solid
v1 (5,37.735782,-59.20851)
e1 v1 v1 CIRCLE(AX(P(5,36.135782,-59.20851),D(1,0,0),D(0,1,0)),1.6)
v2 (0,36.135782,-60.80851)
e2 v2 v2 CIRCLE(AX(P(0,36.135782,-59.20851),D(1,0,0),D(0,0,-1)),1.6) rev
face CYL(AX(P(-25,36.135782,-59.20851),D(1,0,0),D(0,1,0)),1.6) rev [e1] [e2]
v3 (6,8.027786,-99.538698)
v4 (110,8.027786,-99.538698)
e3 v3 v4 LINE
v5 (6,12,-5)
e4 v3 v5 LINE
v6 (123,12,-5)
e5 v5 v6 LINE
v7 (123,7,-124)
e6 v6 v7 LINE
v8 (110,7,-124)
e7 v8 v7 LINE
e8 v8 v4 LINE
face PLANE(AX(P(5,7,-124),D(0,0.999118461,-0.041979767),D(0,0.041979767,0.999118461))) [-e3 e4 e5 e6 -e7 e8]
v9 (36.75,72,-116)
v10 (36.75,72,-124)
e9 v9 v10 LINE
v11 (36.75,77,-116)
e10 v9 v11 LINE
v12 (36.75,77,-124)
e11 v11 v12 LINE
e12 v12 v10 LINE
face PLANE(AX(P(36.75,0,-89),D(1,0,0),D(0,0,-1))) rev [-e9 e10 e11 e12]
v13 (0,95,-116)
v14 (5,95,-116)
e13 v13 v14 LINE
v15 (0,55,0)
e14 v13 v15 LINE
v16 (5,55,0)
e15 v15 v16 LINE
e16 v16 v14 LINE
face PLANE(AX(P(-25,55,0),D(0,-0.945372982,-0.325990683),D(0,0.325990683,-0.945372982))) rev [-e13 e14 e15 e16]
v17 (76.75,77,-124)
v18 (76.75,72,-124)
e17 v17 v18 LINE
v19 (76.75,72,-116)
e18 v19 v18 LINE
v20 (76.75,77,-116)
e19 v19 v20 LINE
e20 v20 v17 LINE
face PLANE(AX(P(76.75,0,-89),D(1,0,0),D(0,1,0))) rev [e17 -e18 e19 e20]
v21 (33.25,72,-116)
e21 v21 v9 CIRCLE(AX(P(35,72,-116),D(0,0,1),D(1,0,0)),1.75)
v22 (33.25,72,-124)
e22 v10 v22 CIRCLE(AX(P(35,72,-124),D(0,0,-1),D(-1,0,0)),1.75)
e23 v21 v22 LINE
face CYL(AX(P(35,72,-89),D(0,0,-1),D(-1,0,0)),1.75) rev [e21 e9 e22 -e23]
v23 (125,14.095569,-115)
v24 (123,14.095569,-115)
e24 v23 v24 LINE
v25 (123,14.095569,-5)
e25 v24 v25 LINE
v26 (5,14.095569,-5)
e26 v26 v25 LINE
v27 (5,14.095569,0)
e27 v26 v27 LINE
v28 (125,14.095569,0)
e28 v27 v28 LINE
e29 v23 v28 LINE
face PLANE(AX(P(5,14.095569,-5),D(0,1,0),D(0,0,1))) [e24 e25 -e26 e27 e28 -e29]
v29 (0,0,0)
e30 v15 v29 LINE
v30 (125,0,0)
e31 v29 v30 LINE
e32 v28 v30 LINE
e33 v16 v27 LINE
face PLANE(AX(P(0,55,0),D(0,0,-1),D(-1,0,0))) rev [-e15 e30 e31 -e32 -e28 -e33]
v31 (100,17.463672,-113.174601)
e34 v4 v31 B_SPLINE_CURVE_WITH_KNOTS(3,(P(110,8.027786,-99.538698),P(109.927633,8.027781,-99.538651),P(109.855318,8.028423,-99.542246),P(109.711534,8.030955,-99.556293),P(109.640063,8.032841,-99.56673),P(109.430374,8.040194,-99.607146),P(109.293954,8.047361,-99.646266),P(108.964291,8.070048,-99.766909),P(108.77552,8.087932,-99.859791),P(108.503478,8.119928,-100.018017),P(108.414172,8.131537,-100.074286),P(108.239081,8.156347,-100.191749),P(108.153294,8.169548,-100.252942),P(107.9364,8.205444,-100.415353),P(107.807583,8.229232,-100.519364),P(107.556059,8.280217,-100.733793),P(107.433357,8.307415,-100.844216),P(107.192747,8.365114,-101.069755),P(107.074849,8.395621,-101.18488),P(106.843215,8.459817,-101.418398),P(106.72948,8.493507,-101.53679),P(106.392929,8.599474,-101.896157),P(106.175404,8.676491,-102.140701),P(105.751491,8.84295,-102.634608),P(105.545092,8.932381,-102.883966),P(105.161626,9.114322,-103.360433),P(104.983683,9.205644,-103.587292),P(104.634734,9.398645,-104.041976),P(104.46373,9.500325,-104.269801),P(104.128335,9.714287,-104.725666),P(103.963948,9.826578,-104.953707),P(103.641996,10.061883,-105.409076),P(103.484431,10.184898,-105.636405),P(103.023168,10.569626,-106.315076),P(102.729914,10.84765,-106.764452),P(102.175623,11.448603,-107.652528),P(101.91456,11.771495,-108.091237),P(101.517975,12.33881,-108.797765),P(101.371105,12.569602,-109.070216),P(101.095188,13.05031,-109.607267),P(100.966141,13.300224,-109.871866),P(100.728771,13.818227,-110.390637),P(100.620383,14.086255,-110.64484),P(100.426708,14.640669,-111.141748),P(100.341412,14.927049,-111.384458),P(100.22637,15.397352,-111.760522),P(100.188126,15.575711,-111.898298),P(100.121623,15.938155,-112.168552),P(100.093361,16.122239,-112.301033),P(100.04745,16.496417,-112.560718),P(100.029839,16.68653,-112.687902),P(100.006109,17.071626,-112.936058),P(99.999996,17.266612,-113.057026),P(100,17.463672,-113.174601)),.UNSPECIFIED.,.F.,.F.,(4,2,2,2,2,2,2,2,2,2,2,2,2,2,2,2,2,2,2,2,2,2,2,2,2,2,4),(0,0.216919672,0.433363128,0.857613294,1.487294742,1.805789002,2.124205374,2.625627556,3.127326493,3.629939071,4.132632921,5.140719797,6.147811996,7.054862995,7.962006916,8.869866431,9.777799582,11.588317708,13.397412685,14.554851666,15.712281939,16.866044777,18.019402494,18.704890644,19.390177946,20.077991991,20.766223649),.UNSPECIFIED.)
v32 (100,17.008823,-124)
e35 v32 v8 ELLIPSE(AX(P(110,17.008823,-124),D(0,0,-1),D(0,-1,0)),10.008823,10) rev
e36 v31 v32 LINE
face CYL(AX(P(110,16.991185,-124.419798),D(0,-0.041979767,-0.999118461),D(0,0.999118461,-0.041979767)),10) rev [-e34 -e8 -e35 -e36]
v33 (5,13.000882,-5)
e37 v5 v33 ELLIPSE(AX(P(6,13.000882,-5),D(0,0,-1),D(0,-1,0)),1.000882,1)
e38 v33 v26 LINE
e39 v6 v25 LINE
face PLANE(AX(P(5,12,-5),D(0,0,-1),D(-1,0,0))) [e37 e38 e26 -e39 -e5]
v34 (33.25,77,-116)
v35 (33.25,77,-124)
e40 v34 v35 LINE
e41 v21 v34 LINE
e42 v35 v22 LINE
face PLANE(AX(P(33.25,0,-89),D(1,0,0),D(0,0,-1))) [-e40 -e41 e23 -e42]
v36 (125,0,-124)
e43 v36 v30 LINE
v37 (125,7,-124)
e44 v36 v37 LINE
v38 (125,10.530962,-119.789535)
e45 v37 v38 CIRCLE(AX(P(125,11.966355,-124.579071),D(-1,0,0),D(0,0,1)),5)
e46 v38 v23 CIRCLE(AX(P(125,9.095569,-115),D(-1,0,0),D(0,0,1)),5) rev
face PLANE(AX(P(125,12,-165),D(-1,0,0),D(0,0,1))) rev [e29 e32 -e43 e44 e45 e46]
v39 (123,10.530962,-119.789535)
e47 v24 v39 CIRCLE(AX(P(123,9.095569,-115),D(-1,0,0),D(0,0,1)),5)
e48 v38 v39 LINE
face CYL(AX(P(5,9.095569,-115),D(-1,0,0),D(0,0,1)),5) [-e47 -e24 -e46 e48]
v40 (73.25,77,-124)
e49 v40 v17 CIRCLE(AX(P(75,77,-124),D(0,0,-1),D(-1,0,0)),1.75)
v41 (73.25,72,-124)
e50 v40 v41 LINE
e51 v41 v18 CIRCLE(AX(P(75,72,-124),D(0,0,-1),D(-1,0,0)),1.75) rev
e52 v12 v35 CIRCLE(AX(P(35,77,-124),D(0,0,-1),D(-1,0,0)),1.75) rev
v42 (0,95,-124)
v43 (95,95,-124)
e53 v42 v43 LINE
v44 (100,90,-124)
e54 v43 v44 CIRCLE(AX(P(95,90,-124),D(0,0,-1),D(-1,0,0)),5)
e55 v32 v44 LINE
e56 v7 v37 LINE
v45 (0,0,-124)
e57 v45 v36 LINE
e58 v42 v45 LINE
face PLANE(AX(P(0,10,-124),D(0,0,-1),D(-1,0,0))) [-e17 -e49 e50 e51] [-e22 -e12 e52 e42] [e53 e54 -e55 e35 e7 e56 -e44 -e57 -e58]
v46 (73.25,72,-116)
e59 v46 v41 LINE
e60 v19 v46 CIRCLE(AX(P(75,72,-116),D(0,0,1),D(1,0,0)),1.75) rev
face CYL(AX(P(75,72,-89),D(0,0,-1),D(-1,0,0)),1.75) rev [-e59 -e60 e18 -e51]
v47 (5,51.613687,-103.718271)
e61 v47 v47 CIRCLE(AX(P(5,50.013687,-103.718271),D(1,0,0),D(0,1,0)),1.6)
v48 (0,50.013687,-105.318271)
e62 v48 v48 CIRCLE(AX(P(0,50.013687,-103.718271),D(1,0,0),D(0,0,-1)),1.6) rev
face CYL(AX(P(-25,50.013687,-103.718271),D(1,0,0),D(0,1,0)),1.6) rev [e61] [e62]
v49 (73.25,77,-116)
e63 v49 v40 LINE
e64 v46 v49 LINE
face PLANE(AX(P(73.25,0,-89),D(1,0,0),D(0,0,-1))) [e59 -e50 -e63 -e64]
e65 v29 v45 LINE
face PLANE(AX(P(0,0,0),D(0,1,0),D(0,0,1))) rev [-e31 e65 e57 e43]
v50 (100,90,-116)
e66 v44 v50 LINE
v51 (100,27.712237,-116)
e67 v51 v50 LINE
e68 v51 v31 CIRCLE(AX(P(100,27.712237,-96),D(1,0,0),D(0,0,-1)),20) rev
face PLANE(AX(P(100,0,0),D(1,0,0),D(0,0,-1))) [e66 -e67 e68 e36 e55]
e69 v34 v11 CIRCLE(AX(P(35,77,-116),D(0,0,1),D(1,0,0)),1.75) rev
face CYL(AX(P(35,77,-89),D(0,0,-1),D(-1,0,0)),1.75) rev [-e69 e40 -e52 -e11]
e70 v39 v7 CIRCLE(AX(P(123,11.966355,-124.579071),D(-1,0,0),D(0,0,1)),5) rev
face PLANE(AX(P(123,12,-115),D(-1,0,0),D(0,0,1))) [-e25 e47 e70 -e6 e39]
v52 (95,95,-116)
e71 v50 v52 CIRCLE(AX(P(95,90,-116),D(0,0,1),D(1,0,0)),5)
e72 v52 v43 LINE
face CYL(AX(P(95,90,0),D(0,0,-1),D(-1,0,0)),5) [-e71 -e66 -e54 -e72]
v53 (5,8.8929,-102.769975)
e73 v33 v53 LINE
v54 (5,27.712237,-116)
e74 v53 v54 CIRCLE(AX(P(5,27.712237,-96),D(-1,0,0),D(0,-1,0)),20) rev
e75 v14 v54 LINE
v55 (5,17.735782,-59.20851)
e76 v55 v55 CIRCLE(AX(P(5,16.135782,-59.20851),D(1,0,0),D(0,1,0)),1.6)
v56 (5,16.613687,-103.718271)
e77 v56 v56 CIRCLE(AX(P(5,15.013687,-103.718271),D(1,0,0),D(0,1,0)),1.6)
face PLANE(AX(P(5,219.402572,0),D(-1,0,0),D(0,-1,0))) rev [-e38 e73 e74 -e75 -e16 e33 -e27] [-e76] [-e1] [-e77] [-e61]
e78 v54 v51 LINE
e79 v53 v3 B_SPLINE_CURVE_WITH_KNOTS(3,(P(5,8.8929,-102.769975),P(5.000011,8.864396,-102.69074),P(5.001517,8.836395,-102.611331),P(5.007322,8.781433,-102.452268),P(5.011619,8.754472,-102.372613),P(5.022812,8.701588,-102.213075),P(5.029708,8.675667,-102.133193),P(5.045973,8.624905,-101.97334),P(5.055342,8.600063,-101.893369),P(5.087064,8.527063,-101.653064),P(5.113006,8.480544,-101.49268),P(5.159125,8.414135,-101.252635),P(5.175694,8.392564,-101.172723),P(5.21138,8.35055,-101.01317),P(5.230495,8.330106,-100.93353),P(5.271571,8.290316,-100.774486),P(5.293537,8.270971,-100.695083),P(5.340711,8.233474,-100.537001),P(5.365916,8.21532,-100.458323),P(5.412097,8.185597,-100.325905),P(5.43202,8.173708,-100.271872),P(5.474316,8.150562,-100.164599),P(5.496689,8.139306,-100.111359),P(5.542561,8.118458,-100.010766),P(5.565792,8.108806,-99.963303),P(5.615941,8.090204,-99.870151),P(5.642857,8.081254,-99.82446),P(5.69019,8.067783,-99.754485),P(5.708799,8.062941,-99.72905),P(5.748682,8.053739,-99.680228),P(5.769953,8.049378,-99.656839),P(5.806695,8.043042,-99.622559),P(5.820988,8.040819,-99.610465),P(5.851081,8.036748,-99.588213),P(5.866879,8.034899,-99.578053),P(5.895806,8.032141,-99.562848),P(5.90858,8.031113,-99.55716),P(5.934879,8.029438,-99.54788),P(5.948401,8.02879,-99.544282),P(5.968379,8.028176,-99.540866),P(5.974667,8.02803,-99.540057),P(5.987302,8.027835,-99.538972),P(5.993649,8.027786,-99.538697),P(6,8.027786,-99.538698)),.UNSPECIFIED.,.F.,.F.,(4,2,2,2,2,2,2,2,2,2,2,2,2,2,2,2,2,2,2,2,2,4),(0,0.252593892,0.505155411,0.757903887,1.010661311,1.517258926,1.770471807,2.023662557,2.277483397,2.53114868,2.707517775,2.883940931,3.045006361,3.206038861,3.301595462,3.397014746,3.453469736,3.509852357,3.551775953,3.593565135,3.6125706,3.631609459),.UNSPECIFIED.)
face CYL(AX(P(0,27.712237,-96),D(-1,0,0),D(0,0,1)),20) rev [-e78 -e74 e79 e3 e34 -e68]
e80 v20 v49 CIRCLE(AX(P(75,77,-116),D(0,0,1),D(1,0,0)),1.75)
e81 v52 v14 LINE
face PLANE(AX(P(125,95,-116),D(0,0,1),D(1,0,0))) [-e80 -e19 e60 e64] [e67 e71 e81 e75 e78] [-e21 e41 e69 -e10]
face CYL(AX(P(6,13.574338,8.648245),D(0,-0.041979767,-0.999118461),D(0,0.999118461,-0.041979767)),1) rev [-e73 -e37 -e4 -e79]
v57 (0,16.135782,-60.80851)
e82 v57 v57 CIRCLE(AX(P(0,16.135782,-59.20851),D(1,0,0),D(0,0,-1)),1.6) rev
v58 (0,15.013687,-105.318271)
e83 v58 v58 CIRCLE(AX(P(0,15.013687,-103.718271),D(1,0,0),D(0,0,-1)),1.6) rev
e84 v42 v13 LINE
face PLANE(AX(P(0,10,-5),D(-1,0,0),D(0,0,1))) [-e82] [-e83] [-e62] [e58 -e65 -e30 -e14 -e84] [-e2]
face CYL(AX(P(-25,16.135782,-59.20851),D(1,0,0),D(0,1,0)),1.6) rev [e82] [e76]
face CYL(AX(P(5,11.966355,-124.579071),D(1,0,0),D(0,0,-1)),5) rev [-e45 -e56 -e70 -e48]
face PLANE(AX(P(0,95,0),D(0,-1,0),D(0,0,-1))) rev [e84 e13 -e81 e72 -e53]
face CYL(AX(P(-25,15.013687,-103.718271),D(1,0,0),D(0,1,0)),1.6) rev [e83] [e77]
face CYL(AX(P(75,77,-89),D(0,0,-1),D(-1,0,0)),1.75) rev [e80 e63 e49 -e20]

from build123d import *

# Parameters (mm, degrees)
SKETCH1_W            = 155
SKETCH1_H            = 5
BOSS_EXTRUDE2_DEPTH  = 55
SKETCH2_W            = 112
SKETCH2_H            = 45
SKETCH2_R            = 1.75
CUT_EXTRUDE1_DEPTH   = 55
SKETCH3_W            = 100
SKETCH3_H            = 20
CUT_EXTRUDE2_DEPTH   = 55
SKETCH4_W            = 40
SKETCH4_H            = 8.065867699
CUT_EXTRUDE3_DEPTH   = 55
BOSS_EXTRUDE4_DEPTH  = 5
CUT_EXTRUDE4_DEPTH   = 50
SKETCH9_W            = 4.377781836
SKETCH9_H            = 86.488706471
BOSS_EXTRUDE7_DEPTH  = 50
SKETCH10_W           = 20
SKETCH10_H           = 86.532324722
CUT_EXTRUDE5_DEPTH   = 10
SKETCH12_R           = 9.5
SKETCH12_R_2         = 6
CUT_EXTRUDE6_DEPTH   = 10
CUT_EXTRUDE7_START   = 50
SKETCH13_R           = 9.5
SKETCH13_R_2         = 6
CUT_EXTRUDE7_DEPTH   = 50
CUT_EXTRUDE8_DEPTH   = 50
CUT_EXTRUDE9_DEPTH   = 50
CUT_EXTRUDE10_DEPTH  = 10
FILLET5_R            = 3
SKETCH18_W           = 98.767816147
SKETCH18_H           = 10.604205858
BOSS_EXTRUDE8_DEPTH  = 5
CUT_EXTRUDE11_DEPTH  = 5
SKETCH20_W           = 155
SKETCH20_H           = 119
BOSS_EXTRUDE9_DEPTH  = 10
CUT_EXTRUDE13_DEPTH  = 155
SKETCH24_W           = 125
SKETCH24_H           = 8
BOSS_EXTRUDE10_DEPTH = 95
FILLET6_R            = 20
SKETCH26_W           = 16
SKETCH26_H           = 1.5
BOSS_EXTRUDE11_DEPTH = 12
BOSS_EXTRUDE12_DEPTH = 15
SKETCH28_R           = 2.5
CUT_EXTRUDE15_DEPTH  = 5
CUT_EXTRUDE17_DEPTH  = 35
SKETCH29_W           = 43
SKETCH29_H           = 43
CUT_EXTRUDE18_DEPTH  = 35
FILLET9_R            = 10
SKETCH31_W           = 124
SKETCH31_H           = 12
BOSS_EXTRUDE14_DEPTH = 2
SKETCH32_W           = 5
SKETCH32_H           = 2
BOSS_EXTRUDE15_DEPTH = 132
SKETCH33_W           = 20
SKETCH33_H           = 12
CUT_EXTRUDE19_DEPTH  = 160
SKETCH34_W           = 2
SKETCH34_H           = 12
BOSS_EXTRUDE17_DEPTH = 123
SKETCH36_R           = 6
CUT_EXTRUDE20_DEPTH  = 40
CUT_EXTRUDE21_DEPTH  = 25
SKETCH39_W           = 10
SKETCH39_H           = 12
CUT_EXTRUDE22_DEPTH  = 165
SKETCH40_W           = 2
SKETCH40_H           = 12
BOSS_EXTRUDE18_DEPTH = 115
SKETCH41_W           = 5
SKETCH41_H           = 64.538049938
BOSS_EXTRUDE19_DEPTH = 5
BOSS_EXTRUDE20_REACH = 223.912
SKETCH42_W           = 10
SKETCH42_H           = 124
SKETCH45_R           = 1.6
CUT_EXTRUDE23_DEPTH  = 30
SKETCH46_W           = 157.555653428
SKETCH46_H           = 97.617109351
CUT_EXTRUDE24_DEPTH  = 160
BOSS_EXTRUDE22_DEPTH = 120
SKETCH52_W           = 2
SKETCH52_H           = 14.095569493
BOSS_EXTRUDE23_DEPTH = 120
FILLET14_R           = 10
FILLET15_R           = 5
FILLET16_R           = 5
FILLET17_R           = 5
FILLET18_R           = 1
CUT_EXTRUDE27_DEPTH  = 30


with BuildPart() as part:
    # Sketch1 → Boss-Extrude2 (new body)
    with BuildSketch(Plane(origin=(0, 0, 0), x_dir=(1, 0, 0), z_dir=(0, 1, 0))):
        Polygon((-44.578450817, 29.59757322), (-48.782107146, 26.890310125), (-130, 153), (-125.796343671, 155.707263095), align=None)
        with BuildLine():
            ThreePointArc((0, 0), (-27.802696096, 7.256044178), (-48.782107146, 26.890310125))
            Line((-48.782107146, 26.890310125), (-44.578450817, 29.59757322))
            Line((-44.578450817, 29.59757322), (0, 5))
            Line((0, 5), (0, 0))
        make_face()
        with Locations((77.5, 2.5)):
            Rectangle(SKETCH1_W, SKETCH1_H)
    extrude(amount=BOSS_EXTRUDE2_DEPTH)

    # Sketch2 → Cut-Extrude1 (cut)
    with BuildSketch(Plane.XY):
        with Locations((99, 32.5)):
            Rectangle(SKETCH2_W, SKETCH2_H)
        with Locations((5, 25)):
            Circle(SKETCH2_R)
        with Locations((5, 50)):
            Circle(SKETCH2_R)
        with Locations((35, 50)):
            Circle(SKETCH2_R)
        with Locations((35, 25)):
            Circle(SKETCH2_R)
    extrude(amount=-CUT_EXTRUDE1_DEPTH, mode=Mode.SUBTRACT)

    # Sketch3 → Cut-Extrude2 (cut)
    with BuildSketch(Plane(origin=(-22.239707671, 0, 14.322945338), x_dir=(0.5414526190246729, 0, 0.840731265834287), z_dir=(-0.8407312658342869, 0, 0.5414526190246728))):
        with Locations((-99.020724146, 15)):
            Rectangle(SKETCH3_W, SKETCH3_H)
    extrude(amount=-CUT_EXTRUDE2_DEPTH, mode=Mode.SUBTRACT)

    # Sketch4 → Cut-Extrude3 (cut)
    with BuildSketch(Plane(origin=(2.114976352, 0, -3.832994761), x_dir=(-0.8755563671808256, 0, -0.48311597767939257), z_dir=(0.48311597767939257, 0, -0.8755563671808256))):
        with Locations((28.330006975, 9.03293385)):
            Rectangle(SKETCH4_W, SKETCH4_H)
    extrude(amount=-CUT_EXTRUDE3_DEPTH, mode=Mode.SUBTRACT)

    # Sketch5 → Boss-Extrude4 (add)
    with BuildSketch(Plane.XZ):
        Polygon((0, -5), (-44.578450817, -29.59757322), (-125.796343671, -155.707263095), (0, -155.707263095), align=None)
    extrude(amount=-BOSS_EXTRUDE4_DEPTH)

    # Sketch8 → Cut-Extrude4 (cut)
    with BuildSketch(Plane(origin=(0, 5, 0), x_dir=(1, 0, 0), z_dir=(0, 1, 0))):
        Polygon((-44.578450817, 29.59757322), (-98.72371272, 113.670699803), (-44.578450817, 113.670699803), align=None)
    extrude(amount=-CUT_EXTRUDE4_DEPTH, mode=Mode.SUBTRACT)

    # Sketch9 → Boss-Extrude7 (add)
    with BuildSketch(Plane(origin=(0, 5, 0), x_dir=(1, 0, 0), z_dir=(0, 1, 0))):
        with Locations((-42.389559899, 70.426346568)):
            Rectangle(SKETCH9_W, SKETCH9_H)
    extrude(amount=BOSS_EXTRUDE7_DEPTH)

    # Sketch10 → Cut-Extrude5 (cut)
    with BuildSketch(Plane(origin=(0, 5, 0), x_dir=(1, 0, 0), z_dir=(0, 1, 0))):
        with Locations((-30.200668981, 70.404537442)):
            Rectangle(SKETCH10_W, SKETCH10_H)
    extrude(amount=-CUT_EXTRUDE5_DEPTH, mode=Mode.SUBTRACT)

    # Sketch12 → Cut-Extrude6 (cut)
    with BuildSketch(Plane(origin=(-40.200668981, 0, 0), x_dir=(0, 0, -1), z_dir=(1, 0, 0))):
        with Locations(Location((57.181993332, 10, 0), (0, 0, 90))):
            Circle(SKETCH12_R)
        with Locations(Location((77.181993332, 10, 0), (0, 0, 90))):
            Circle(SKETCH12_R_2)
    extrude(amount=-CUT_EXTRUDE6_DEPTH, mode=Mode.SUBTRACT)

    # Sketch13 → Cut-Extrude7 (cut)
    with BuildSketch(Plane(origin=(-40.200668981, 0, 0), x_dir=(0, 0, -1), z_dir=(1, 0, 0)).offset(CUT_EXTRUDE7_START)):
        with Locations(Location((57.181993332, 10, 0), (0, 0, 90))):
            Circle(SKETCH13_R)
        with Locations(Location((77.181993332, 10, 0), (0, 0, 90))):
            Circle(SKETCH13_R_2)
    extrude(amount=-CUT_EXTRUDE7_DEPTH, mode=Mode.SUBTRACT)

    # Sketch14 → Cut-Extrude8 (cut)
    with BuildSketch(Plane(origin=(0, 5, 0), x_dir=(1, 0, 0), z_dir=(0, 1, 0))):
        Polygon((0, 103.038090201), (-91.876037903, 103.038090201), (-126.106254173, 155.707263095), (0, 155.707263095), align=None)
    extrude(amount=-CUT_EXTRUDE8_DEPTH, mode=Mode.SUBTRACT)

    # Sketch15 → Cut-Extrude9 (cut)
    with BuildSketch(Plane(origin=(-22.239707671, 0, 14.322945338), x_dir=(0.5414526190246729, 0, 0.840731265834287), z_dir=(-0.8407312658342869, 0, 0.5414526190246728))):
        Polygon((-176.035909688, 0), (-199.020724146, 18.247450711), (-199.020724146, 0), align=None)
    extrude(amount=-CUT_EXTRUDE9_DEPTH, mode=Mode.SUBTRACT)

    # Sketch16 → Cut-Extrude10 (cut)
    with BuildSketch(Plane(origin=(-40.200668981, 0, 0), x_dir=(0, 0, -1), z_dir=(1, 0, 0))):
        Polygon((113.670699803, 15.495236251), (48.252901996, 55), (113.670699803, 55), align=None)
    extrude(amount=-CUT_EXTRUDE10_DEPTH, mode=Mode.SUBTRACT)

    # Fillet5
    fillet5_edges = [part.edges().sort_by_distance(p)[0] for p in [
        (-100.847592598, 5, -112.302866383),
        (-46.680278982, 25, -28.243941672),
        (-46.680278982, 5, -28.243941672),
        (-100.825540884, 25, -112.317068256),
    ]]
    fillet(fillet5_edges, radius=FILLET5_R)

    # Sketch18 → Boss-Extrude8 (add)
    with BuildSketch(Plane(origin=(0, 5, 0), x_dir=(1, 0, 0), z_dir=(0, 1, 0))):
        with Locations((-49.383908074, 108.34019313)):
            Rectangle(SKETCH18_W, SKETCH18_H)
    extrude(amount=-BOSS_EXTRUDE8_DEPTH)

    # Sketch19 → Cut-Extrude11 (cut)
    with BuildSketch(Plane.XZ):
        Polygon((-97.82324149, -103.038090201), (-98.767816147, -104.504762295), (-98.767816147, -103.038090201), align=None)
    extrude(amount=-CUT_EXTRUDE11_DEPTH, mode=Mode.SUBTRACT)

    # Sketch20 → Boss-Extrude9 (add)
    with BuildSketch(Plane.XZ):
        with Locations((77.5, -64.5)):
            Rectangle(SKETCH20_W, SKETCH20_H)
    extrude(amount=-BOSS_EXTRUDE9_DEPTH)

    # Sketch21 → Cut-Extrude13 (cut)
    with BuildSketch(Plane(origin=(155, 0, 0), x_dir=(0, 0, -1), z_dir=(1, 0, 0))):
        Polygon((5, 10), (124, 10), (124, 7), align=None)
    extrude(amount=-CUT_EXTRUDE13_DEPTH, mode=Mode.SUBTRACT)

    # Sketch24 → Boss-Extrude10 (add)
    with BuildSketch(Plane.XZ):
        with Locations((62.5, -120)):
            Rectangle(SKETCH24_W, SKETCH24_H)
    extrude(amount=-BOSS_EXTRUDE10_DEPTH)

    # Fillet6
    fillet6_edges = [part.edges().sort_by_distance(p)[0] for p in [
        (62.5, 7.201680672, -116),
    ]]
    fillet(fillet6_edges, radius=FILLET6_R)

    # Sketch26 → Boss-Extrude11 (add)
    with BuildSketch(Plane(origin=(2.114976352, 0, -3.832994761), x_dir=(-0.8755563671808256, 0, -0.48311597767939257), z_dir=(0.48311597767939257, 0, -0.8755563671808256))):
        with Locations((28.330006975, 13.815867699)):
            Rectangle(SKETCH26_W, SKETCH26_H)
    extrude(amount=BOSS_EXTRUDE11_DEPTH)

    # Sketch27 → Boss-Extrude12 (add)
    with BuildSketch(Plane(origin=(0, 14.565867699, 0), x_dir=(1, 0, 0), z_dir=(0, 1, 0))):
        Polygon((-15.6850907, 13.654745957), (-9.887698968, 24.161422363), (-23.896600843, 31.891278006), (-29.693992575, 21.384601599), (-28.030435477, 20.466681242), (-23.150964103, 29.30980055), (-12.469176423, 23.415785623), (-17.348647798, 14.572666314), align=None)
    extrude(amount=BOSS_EXTRUDE12_DEPTH)

    # Sketch28 → Cut-Extrude15 (cut)
    with BuildSketch(Plane(origin=(0, 14.565867699, 0), x_dir=(1, 0, 0), z_dir=(0, 1, 0))):
        with Locations(Location((-20.24980595, 21.941233432, 0), (0, 0, 180))):
            Circle(SKETCH28_R)
    extrude(amount=-CUT_EXTRUDE15_DEPTH, mode=Mode.SUBTRACT)

    # Sketch25 → Cut-Extrude17 (cut)
    with BuildSketch(Plane(origin=(0, 0, -124), x_dir=(-1, 0, 0), z_dir=(0, 0, -1))):
        with BuildLine():
            Line((-36.75, 77), (-36.75, 72))
            ThreePointArc((-36.75, 72), (-35, 70.25), (-33.25, 72))
            Line((-33.25, 72), (-33.25, 77))
            ThreePointArc((-33.25, 77), (-35, 78.75), (-36.75, 77))
        make_face()
        with BuildLine():
            Line((-73.25, 77), (-73.25, 72))
            ThreePointArc((-73.25, 72), (-75, 70.25), (-76.75, 72))
            Line((-76.75, 72), (-76.75, 77))
            ThreePointArc((-76.75, 77), (-75, 78.75), (-73.25, 77))
        make_face()
    extrude(amount=-CUT_EXTRUDE17_DEPTH, mode=Mode.SUBTRACT)

    # Sketch29 → Cut-Extrude18 (cut)
    with BuildSketch(Plane.XY):
        with Locations((21.5, 33.5)):
            Rectangle(SKETCH29_W, SKETCH29_H)
    extrude(amount=-CUT_EXTRUDE18_DEPTH, mode=Mode.SUBTRACT)

    # Fillet9
    fillet9_edges = [part.edges().sort_by_distance(p)[0] for p in [
        (-115.522140631, 0, -134.985040643),
        (-127.898171835, 18.247450711, -154.353631548),
        (-42.389559899, 15.495236251, -113.670699803),
        (-42.389559899, 55, -48.252901996),
        (-127.898171835, 55, -154.353631548),
    ]]
    fillet(fillet9_edges, radius=FILLET9_R)

    # Sketch31 → Boss-Extrude14 (add)
    with BuildSketch(Plane(origin=(155, 0, 0), x_dir=(0, 0, -1), z_dir=(1, 0, 0))):
        with Locations((62, 6)):
            Rectangle(SKETCH31_W, SKETCH31_H)
    extrude(amount=-BOSS_EXTRUDE14_DEPTH)

    # Sketch32 → Boss-Extrude15 (add)
    with BuildSketch(Plane.ZY.offset(-153)):
        with Locations((-2.5, 11)):
            Rectangle(SKETCH32_W, SKETCH32_H)
    extrude(amount=BOSS_EXTRUDE15_DEPTH)

    # Sketch33 → Cut-Extrude19 (cut)
    with BuildSketch(Plane.XY):
        with Locations((145, 6)):
            Rectangle(SKETCH33_W, SKETCH33_H)
    extrude(amount=-CUT_EXTRUDE19_DEPTH, mode=Mode.SUBTRACT)

    # Sketch34 → Boss-Extrude17 (add)
    with BuildSketch(Plane.XY):
        with Locations((134, 6)):
            Rectangle(SKETCH34_W, SKETCH34_H)
    extrude(amount=-BOSS_EXTRUDE17_DEPTH)

    # Sketch36 → Cut-Extrude20 (cut, symmetric)
    with BuildSketch(Plane(origin=(-40.200668981, 0, 0), x_dir=(0, 0, -1), z_dir=(1, 0, 0))):
        with Locations(Location((90.194878088, 10, 0), (0, 0, 90))):
            Circle(SKETCH36_R)
    extrude(amount=CUT_EXTRUDE20_DEPTH, both=True, mode=Mode.SUBTRACT)

    # Sketch38 → Cut-Extrude21 (cut)
    with BuildSketch(Plane(origin=(125, 0, 0), x_dir=(0, 0, -1), z_dir=(1, 0, 0))):
        Polygon((95.495958465, 7.718589282), (124, 7), (124, 95), (116, 95), align=None)
    extrude(amount=-CUT_EXTRUDE21_DEPTH, mode=Mode.SUBTRACT)

    # Sketch39 → Cut-Extrude22 (cut)
    with BuildSketch(Plane.XY):
        with Locations((130, 6)):
            Rectangle(SKETCH39_W, SKETCH39_H)
    extrude(amount=-CUT_EXTRUDE22_DEPTH, mode=Mode.SUBTRACT)

    # Sketch40 → Boss-Extrude18 (add)
    with BuildSketch(Plane.XY):
        with Locations((124, 6)):
            Rectangle(SKETCH40_W, SKETCH40_H)
    extrude(amount=-BOSS_EXTRUDE18_DEPTH)

    # Sketch41 → Boss-Extrude19 (add)
    with BuildSketch(Plane(origin=(0, 5, 0), x_dir=(1, 0, 0), z_dir=(0, 1, 0))):
        with Locations((-2.5, 81.37327109)):
            Rectangle(SKETCH41_W, SKETCH41_H)
    extrude(amount=-BOSS_EXTRUDE19_DEPTH)

    # Boss-Extrude20: up to this face of the body (flat: up to its plane)
    boss_extrude20_end = Plane(part.part.faces().sort_by_distance((50, 95, -120))[0])
    # Sketch42 → Boss-Extrude20 (add, up to the picked face)
    with BuildSketch(Plane(origin=(0, 5, 0), x_dir=(1, 0, 0), z_dir=(0, 1, 0)), mode=Mode.PRIVATE) as boss_extrude20_sk1:
        with Locations((0, 62)):
            Rectangle(SKETCH42_W, SKETCH42_H)
    boss_extrude20_tool1 = split(extrude(boss_extrude20_sk1.sketch, amount=BOSS_EXTRUDE20_REACH, mode=Mode.PRIVATE), bisect_by=boss_extrude20_end, keep=Keep.BOTH, mode=Mode.PRIVATE)
    add(boss_extrude20_tool1.solids().sort_by(Axis((0, 5, -62), (0, 1, 0)))[0])

    # Sketch45 → Cut-Extrude23 (cut)
    with BuildSketch(Plane(origin=(5, 0, 0), x_dir=(0, 0, -1), z_dir=(1, 0, 0))):
        with Locations(Location((59.208509529, 36.135781847, 0), (0, 0, 90))):
            Circle(SKETCH45_R)
        with Locations(Location((59.208509529, 16.135781847, 0), (0, 0, 90))):
            Circle(SKETCH45_R)
        with Locations(Location((103.718271361, 50.013687011, 0), (0, 0, 90))):
            Circle(SKETCH45_R)
        with Locations(Location((103.718271361, 15.013687011, 0), (0, 0, 90))):
            Circle(SKETCH45_R)
    extrude(amount=-CUT_EXTRUDE23_DEPTH, mode=Mode.SUBTRACT)

    # Sketch46 → Cut-Extrude24 (cut)
    with BuildSketch(Plane.XY):
        with Locations((-78.777826714, 48.808554676)):
            Rectangle(SKETCH46_W, SKETCH46_H)
    extrude(amount=-CUT_EXTRUDE24_DEPTH, mode=Mode.SUBTRACT)

    # Sketch51 → Boss-Extrude22 (add)
    with BuildSketch(Plane(origin=(125, 0, 0), x_dir=(0, 0, -1), z_dir=(1, 0, 0))):
        Polygon((124, 7), (5, 12), (5, 14.095569493), (0, 14.095569493), (0, 7.113445378), align=None)
    extrude(amount=-BOSS_EXTRUDE22_DEPTH)

    # Sketch52 → Boss-Extrude23 (add)
    with BuildSketch(Plane.XY):
        with Locations((124, 7.047784747)):
            Rectangle(SKETCH52_W, SKETCH52_H)
    extrude(amount=-BOSS_EXTRUDE23_DEPTH)

    # Fillet14
    fillet14_edges = [part.edges().sort_by_distance(p)[0] for p in [
        (100, 7.513892889, -111.769349239),
    ]]
    fillet(fillet14_edges, radius=FILLET14_R)

    # Fillet15
    fillet15_edges = [part.edges().sort_by_distance(p)[0] for p in [
        (124, 14.095569493, -120),
    ]]
    fillet(fillet15_edges, radius=FILLET15_R)

    # Fillet16
    # the kernel refuses this fillet: 5 mm, written as the material it adds along each edge
    with BuildSketch(Plane(origin=(123, 7.168067227, -120), x_dir=(0, 0.9980473315851939, 0.062462179882501946), z_dir=(1, 0, 0))) as fillet16_piece_1:
        with BuildLine():
            CenterArc((4.502899102, -4.869840665), FILLET16_R, 103.101980319, 66.66628485)
            Line((-0.417587767, -3.981691481), (-0.909636454, -3.892876563))
            ThreePointArc((-0.909636454, -3.892876563), (-0.706066567, -1.938693285), (-0.497272683, 0.052152456))
            Line((-0.497272683, 0.052152456), (0.03123109, 0.499023666))
            ThreePointArc((0.03123109, 0.499023666), (1.954969583, 0.378627673), (3.256131762, 0.486984066))
            Line((3.256131762, 0.486984066), (3.369474248, 0))
        make_face()
    extrude(amount=2)

    # Fillet17
    fillet17_edges = [part.edges().sort_by_distance(p)[0] for p in [
        (100, 95, -120),
    ]]
    fillet(fillet17_edges, radius=FILLET17_R)

    # Fillet18
    fillet18_edges = [part.edges().sort_by_distance(p)[0] for p in [
        (5, 10.013892889, -52.269349239),
    ]]
    fillet(fillet18_edges, radius=FILLET18_R)

    # Sketch54 → Cut-Extrude27 (cut)
    with BuildSketch(Plane(origin=(5, 0, 0), x_dir=(0, 0, -1), z_dir=(1, 0, 0))):
        Polygon((0, 55), (116, 95), (0, 95), align=None)
    extrude(amount=-CUT_EXTRUDE27_DEPTH, mode=Mode.SUBTRACT)


solid = part.part
